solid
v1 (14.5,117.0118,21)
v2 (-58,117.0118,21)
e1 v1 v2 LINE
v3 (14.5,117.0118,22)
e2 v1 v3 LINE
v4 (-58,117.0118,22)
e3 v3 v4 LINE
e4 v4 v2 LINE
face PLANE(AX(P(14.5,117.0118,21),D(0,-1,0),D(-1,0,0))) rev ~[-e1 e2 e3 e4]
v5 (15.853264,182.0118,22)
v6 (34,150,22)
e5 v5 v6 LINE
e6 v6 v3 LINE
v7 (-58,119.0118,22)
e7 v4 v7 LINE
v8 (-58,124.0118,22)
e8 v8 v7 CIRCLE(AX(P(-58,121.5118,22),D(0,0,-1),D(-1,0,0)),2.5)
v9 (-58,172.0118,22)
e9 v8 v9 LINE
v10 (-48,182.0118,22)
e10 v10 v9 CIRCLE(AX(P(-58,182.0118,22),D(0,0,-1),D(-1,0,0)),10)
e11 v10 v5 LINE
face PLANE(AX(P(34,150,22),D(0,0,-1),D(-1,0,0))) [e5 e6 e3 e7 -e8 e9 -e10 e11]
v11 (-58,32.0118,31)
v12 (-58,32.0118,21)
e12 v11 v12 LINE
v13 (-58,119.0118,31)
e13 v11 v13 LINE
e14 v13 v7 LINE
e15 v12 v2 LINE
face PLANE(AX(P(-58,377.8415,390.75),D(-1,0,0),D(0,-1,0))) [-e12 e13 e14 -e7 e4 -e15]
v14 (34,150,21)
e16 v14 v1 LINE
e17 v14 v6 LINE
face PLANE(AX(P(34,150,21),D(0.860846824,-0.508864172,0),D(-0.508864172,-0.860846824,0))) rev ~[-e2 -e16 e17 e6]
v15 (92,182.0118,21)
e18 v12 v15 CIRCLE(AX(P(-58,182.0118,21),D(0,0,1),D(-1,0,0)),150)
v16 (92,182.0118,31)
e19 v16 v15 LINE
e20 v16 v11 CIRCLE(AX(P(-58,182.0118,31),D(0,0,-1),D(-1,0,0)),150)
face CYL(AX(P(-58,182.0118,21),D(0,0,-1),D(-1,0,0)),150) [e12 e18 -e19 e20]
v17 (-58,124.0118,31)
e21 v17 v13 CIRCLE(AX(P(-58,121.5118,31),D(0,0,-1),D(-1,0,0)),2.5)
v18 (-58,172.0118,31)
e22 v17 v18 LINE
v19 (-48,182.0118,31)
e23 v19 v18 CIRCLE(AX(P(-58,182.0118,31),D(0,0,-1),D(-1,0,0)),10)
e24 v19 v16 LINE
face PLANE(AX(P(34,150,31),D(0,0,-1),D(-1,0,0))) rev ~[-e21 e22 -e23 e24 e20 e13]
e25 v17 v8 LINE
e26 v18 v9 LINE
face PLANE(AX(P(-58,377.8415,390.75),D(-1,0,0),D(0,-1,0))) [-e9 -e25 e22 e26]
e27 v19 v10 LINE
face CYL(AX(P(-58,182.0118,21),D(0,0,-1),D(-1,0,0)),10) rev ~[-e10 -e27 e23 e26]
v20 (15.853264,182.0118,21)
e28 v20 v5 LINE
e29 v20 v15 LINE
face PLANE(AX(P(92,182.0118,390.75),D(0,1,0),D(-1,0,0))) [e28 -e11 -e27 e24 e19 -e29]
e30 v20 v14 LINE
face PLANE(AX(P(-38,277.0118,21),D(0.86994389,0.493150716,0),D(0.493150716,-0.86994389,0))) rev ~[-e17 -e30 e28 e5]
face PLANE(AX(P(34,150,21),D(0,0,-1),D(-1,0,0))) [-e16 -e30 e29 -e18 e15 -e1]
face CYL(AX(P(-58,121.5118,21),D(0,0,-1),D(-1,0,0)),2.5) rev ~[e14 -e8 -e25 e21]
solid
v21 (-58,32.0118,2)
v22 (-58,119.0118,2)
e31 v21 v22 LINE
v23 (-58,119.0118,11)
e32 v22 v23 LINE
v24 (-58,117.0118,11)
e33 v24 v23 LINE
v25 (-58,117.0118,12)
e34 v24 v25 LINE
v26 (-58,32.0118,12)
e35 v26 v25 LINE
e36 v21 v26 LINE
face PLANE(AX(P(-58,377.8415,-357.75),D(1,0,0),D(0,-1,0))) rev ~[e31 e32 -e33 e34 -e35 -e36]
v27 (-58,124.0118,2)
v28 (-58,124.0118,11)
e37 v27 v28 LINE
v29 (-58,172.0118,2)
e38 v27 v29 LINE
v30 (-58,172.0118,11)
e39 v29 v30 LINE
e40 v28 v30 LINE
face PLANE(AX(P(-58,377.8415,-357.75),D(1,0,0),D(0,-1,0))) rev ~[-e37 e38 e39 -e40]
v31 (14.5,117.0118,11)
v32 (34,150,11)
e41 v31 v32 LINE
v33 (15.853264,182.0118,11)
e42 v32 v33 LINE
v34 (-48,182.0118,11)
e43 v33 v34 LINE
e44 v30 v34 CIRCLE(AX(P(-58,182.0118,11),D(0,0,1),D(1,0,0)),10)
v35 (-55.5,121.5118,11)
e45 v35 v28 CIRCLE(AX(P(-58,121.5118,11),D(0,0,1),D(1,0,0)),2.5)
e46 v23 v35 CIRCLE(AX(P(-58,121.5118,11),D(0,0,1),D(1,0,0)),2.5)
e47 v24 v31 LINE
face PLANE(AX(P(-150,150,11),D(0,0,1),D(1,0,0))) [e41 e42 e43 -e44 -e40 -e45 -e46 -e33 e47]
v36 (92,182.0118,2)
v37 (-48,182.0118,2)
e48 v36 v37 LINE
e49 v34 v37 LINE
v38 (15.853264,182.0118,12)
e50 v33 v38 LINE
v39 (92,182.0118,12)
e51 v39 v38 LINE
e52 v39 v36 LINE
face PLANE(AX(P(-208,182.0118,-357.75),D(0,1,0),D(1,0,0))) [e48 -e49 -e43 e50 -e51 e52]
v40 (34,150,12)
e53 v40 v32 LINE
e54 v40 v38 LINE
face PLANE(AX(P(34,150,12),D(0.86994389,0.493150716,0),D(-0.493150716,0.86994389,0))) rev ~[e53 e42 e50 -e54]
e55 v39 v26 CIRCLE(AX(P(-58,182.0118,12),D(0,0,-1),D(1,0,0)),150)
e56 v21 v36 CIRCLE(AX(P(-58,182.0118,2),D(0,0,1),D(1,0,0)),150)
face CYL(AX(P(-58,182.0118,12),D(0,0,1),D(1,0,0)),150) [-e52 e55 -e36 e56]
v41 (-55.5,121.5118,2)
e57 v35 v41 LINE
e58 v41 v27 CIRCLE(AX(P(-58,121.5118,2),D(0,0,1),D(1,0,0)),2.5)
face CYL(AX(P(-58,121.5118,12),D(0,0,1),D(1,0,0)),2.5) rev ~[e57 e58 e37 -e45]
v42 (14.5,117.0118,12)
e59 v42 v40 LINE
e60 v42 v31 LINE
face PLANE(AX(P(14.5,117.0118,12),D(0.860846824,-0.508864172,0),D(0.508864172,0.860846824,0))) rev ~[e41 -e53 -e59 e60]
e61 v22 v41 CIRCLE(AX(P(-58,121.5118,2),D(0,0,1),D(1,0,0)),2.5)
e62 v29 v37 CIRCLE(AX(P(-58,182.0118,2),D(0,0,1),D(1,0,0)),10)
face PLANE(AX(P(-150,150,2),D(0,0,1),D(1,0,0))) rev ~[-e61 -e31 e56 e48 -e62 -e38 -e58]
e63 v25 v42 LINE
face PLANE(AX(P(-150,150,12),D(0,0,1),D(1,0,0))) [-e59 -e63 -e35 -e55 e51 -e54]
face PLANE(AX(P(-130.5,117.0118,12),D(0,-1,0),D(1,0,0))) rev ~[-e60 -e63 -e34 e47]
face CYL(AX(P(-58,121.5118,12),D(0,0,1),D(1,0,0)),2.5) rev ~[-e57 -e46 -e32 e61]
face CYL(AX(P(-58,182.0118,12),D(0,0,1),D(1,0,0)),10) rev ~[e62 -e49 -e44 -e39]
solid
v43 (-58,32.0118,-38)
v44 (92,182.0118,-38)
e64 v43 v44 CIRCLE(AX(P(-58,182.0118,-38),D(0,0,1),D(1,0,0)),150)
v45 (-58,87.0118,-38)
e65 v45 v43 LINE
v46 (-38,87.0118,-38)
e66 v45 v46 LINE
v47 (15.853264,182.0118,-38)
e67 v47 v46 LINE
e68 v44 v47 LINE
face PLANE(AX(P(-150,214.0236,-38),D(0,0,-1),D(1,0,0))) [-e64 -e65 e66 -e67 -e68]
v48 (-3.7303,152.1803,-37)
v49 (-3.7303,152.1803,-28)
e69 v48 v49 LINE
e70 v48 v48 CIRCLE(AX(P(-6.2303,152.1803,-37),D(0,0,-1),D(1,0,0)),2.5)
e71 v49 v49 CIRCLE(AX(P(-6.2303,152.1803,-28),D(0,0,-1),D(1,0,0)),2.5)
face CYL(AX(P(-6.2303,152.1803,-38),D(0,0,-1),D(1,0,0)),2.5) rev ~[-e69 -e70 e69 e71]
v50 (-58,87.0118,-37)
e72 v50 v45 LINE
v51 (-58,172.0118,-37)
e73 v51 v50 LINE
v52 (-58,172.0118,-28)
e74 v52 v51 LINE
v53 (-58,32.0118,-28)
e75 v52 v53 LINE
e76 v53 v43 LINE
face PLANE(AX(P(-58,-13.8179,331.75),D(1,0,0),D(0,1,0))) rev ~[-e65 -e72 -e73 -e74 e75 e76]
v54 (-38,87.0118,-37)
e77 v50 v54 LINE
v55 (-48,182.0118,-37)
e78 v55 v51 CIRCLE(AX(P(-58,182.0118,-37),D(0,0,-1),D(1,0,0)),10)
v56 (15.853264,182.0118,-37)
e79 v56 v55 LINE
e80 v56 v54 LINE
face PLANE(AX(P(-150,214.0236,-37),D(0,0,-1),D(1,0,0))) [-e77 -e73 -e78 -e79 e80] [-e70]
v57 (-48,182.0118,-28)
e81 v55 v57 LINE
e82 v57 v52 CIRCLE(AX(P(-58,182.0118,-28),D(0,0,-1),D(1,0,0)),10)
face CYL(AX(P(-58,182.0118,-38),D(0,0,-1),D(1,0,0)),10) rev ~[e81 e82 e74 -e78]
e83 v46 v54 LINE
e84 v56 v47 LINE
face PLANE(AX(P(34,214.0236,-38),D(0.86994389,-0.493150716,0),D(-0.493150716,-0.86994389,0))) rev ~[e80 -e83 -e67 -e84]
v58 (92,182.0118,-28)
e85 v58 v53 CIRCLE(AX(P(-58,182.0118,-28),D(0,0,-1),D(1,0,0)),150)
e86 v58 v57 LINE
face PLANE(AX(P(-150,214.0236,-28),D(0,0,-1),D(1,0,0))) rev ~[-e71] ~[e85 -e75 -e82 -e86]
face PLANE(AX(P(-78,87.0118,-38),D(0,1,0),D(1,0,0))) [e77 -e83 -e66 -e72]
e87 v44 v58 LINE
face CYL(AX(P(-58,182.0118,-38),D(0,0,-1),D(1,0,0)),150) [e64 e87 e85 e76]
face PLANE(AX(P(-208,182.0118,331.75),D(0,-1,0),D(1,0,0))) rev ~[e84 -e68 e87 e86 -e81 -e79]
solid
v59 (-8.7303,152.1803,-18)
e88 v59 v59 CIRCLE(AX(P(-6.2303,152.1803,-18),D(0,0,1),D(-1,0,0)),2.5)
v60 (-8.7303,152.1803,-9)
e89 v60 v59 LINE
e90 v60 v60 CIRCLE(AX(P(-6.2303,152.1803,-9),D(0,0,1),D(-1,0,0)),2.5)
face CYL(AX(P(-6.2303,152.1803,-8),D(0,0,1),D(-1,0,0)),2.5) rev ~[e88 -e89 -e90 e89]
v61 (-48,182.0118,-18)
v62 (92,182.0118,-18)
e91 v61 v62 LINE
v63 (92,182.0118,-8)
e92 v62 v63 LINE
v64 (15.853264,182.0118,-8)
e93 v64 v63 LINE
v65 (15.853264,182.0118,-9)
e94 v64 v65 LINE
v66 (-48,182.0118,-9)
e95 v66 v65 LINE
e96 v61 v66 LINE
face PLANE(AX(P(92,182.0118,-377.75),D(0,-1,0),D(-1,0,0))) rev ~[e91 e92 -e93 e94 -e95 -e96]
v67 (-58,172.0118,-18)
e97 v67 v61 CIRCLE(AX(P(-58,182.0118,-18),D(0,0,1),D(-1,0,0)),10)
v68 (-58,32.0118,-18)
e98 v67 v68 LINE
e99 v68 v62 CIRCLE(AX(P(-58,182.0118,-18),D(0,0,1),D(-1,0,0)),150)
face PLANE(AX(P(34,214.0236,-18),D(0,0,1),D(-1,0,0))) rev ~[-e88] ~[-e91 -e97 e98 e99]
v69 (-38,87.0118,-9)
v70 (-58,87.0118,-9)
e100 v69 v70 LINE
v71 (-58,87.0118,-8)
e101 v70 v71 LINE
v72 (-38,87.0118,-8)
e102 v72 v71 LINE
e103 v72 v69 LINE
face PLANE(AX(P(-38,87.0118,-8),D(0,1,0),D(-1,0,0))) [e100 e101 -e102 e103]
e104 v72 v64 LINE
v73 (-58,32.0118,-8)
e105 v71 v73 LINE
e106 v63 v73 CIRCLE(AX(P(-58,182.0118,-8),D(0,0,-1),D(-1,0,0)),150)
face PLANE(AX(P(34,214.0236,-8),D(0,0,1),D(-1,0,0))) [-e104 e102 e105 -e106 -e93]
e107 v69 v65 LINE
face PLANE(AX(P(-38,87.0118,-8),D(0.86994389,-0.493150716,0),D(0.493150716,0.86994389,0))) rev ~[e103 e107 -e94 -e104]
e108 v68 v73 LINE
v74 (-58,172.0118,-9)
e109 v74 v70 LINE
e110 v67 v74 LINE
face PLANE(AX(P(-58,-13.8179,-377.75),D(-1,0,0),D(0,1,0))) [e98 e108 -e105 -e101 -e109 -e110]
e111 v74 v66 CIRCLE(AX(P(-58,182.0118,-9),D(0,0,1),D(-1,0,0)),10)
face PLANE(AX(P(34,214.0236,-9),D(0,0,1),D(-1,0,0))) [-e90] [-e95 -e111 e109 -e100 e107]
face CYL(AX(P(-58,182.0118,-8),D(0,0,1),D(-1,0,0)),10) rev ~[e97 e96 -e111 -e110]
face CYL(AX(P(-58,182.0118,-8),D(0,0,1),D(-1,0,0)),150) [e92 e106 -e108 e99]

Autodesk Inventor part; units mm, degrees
ref_plane "우측면도" through (0, 0, 0) normal (1, 0, 0) x (0, 1, 0)
ref_plane "평면도" through (0, 0, 0) normal (0, 1, 0) x (-1, 0, 0)
ref_plane "정면도" through (0, 0, 0) normal (0, 0, 1) x (1, 0, 0)
sketch "스케치1" plane through (0, 0, 0) normal (0, 0, 1) x (1, 0, 0)
  line L0 (0, 0) -> (19.5, -32.9882) construction
  circle A0 centre (92, 32.0118) radius 10
  circle A1 centre (143.7697, 61.8433) radius 2.5
  circle A2 centre (40.2303, 61.8433) radius 2.5
  circle A3 centre (92, -28.4882) radius 2.5
  circle A4 centre (92, 32.0118) radius 150
  line L1 (-58, 32.0118) -> (242, 32.0118)
  dimension "d5" = 20
  dimension "d7" = 5
  dimension "d10" = 5
  dimension "d14" = 5
  dimension "d16" = 300
  dimension "d18" = 59.7497
  dimension "d19" = 60.5
  dimension "d20" = 59.7497
  dimension "d21" = 97.4103
extrude "돌출1" add sketch "스케치1" against normal blind 10 contours L1 A4 A0 | A0 L1 A4
sketch "스케치2" plane through (0, 0, 0) normal (0, 0, 1) x (1, 0, 0)
  line L0 (72, 127.0118) -> (0, 0)
  line L1 (184, 0) -> (112, 127.0118)
  line L2 (19.5, -32.9882) -> (164.5, -32.9882)
  line L3 (72, 127.0118) -> (112, 127.0118)
  line L4 (0, 0) -> (19.5, -32.9882)
  line L5 (164.5, -32.9882) -> (184, 0)
  circle A0 centre (92, 32.0118) radius 10
  circle A1 centre (143.7697, 61.8433) radius 2
  circle A2 centre (40.2303, 61.8433) radius 2
  circle A3 centre (92, -28.4882) radius 2
  dimension "d24" = 184
  dimension "d25" = 146
  dimension "d26" = 146
  dimension "d27" = 145
  dimension "d28" = 40
  dimension "d29" = 20
  dimension "d30" = 65
  dimension "d31" = 4
  dimension "d32" = 4.5
  dimension "d33" = 72.5
  dimension "d34" = 4
  dimension "d35" = 4.5
  dimension "d36" = 72.5
  dimension "d37" = 4.5
  dimension "d38" = 4
  dimension "d39" = 72.5
extrude "돌출2" cut sketch "스케치2" against normal blind 1
sketch "스케치3" plane through (92, 32.0118, 0) normal (0, 0, 1) x (1, 0, 0)
  line L0 (0, 195.8297) -> (0, -216.3238)
  point P0 (-92, -32.0118)
surface extrude "돌출 곡면1" sketch "스케치3" along normal mid plane 739.5 shown no curves L0
sketch "스케치4" plane through (0, 0, 0) normal (0, 0, 1) x (1, 0, 0)
  line L0 (-58, 32.0118) -> (242, 32.0118)
  point P0 (0, 0)
sketch "스케치5" plane through (0, 0, -1) normal (0, 0, 1) x (1, 0, 0)
  point P0 (0, 0)
surface extrude "돌출 곡면2" sketch "스케치4" along normal mid plane 739.5 shown no curves L0
split body "분할1" result two bodies by surface "돌출 곡면2" first body at (45.9032, -16.1061, -9.5)
split body "분할2" result two bodies by surface "돌출 곡면1" bodies 3 first body at (108.6328, 95.8416, -9.5)
split body "분할3" result two bodies by surface "돌출 곡면1" bodies 2 first body at (138.1519, -16.0173, -9.5)
move or copy body "본체 이동1" bodies to move or copy 6 copy no translate (-150, 150, 12)
move or copy body "본체 이동2" bodies to move or copy 4 copy no translate (-150, 0, -12)
move or copy body "본체 이동3" bodies to move or copy 7 copy no translate (0, 150, 24)
move or copy body "본체 이동4" bodies to move or copy 7 copy no translate (0, 0, 3)
move or copy body "본체 이동5" bodies to move or copy 4 copy no translate (0, 0, 6)
move or copy body "본체 이동6" bodies to move or copy 4 copy no translate (0, 0, -12)
move or copy body "본체 이동7" bodies to move or copy 5 copy no translate (0, 0, -6)
move or copy body "본체 이동8" bodies to move or copy 5 copy no translate (0, 0, 3)
move or copy body "본체 이동9" bodies to move or copy 7 copy no rotation origin (0, 0, 0) rotation axis (0, 1, 0) rotation angle 180 translate (184, 0, 54)
move or copy body "본체 이동10" bodies to move or copy 4 copy no rotation origin (0, 0, 0) rotation axis (1, 0, 0) rotation angle -180 translate (0, 64.0236, -56)
move or copy body "본체 이동11" bodies to move or copy 5 copy no rotation origin (0, 0, 0) rotation axis (0, 1, 0) rotation angle -180 translate (184, 0, -26)
move or copy body "본체 이동12" bodies to move or copy 5 copy no rotation origin (0, 0, 0) rotation axis (1, 0, 0) rotation angle -180 translate (0, 64.0236, -46)
move or copy body "본체 이동13" bodies to move or copy 7 copy no translate (-150, 0, 0)
move or copy body "본체 이동14" bodies to move or copy 5 copy no translate (-150, 150, 0)
move or copy body "본체 이동15" bodies to move or copy 4 copy no translate (0, 150, 0)
move or copy body "본체 이동16" bodies to move or copy 5 copy no translate (0, 0, 12)
move or copy body "본체 이동17" bodies to move or copy 7 copy no translate (0, 0, -6)
move or copy body "본체 이동18" bodies to move or copy 5 copy no translate (0, 0, 3)
properties part number "밑판 메인"
